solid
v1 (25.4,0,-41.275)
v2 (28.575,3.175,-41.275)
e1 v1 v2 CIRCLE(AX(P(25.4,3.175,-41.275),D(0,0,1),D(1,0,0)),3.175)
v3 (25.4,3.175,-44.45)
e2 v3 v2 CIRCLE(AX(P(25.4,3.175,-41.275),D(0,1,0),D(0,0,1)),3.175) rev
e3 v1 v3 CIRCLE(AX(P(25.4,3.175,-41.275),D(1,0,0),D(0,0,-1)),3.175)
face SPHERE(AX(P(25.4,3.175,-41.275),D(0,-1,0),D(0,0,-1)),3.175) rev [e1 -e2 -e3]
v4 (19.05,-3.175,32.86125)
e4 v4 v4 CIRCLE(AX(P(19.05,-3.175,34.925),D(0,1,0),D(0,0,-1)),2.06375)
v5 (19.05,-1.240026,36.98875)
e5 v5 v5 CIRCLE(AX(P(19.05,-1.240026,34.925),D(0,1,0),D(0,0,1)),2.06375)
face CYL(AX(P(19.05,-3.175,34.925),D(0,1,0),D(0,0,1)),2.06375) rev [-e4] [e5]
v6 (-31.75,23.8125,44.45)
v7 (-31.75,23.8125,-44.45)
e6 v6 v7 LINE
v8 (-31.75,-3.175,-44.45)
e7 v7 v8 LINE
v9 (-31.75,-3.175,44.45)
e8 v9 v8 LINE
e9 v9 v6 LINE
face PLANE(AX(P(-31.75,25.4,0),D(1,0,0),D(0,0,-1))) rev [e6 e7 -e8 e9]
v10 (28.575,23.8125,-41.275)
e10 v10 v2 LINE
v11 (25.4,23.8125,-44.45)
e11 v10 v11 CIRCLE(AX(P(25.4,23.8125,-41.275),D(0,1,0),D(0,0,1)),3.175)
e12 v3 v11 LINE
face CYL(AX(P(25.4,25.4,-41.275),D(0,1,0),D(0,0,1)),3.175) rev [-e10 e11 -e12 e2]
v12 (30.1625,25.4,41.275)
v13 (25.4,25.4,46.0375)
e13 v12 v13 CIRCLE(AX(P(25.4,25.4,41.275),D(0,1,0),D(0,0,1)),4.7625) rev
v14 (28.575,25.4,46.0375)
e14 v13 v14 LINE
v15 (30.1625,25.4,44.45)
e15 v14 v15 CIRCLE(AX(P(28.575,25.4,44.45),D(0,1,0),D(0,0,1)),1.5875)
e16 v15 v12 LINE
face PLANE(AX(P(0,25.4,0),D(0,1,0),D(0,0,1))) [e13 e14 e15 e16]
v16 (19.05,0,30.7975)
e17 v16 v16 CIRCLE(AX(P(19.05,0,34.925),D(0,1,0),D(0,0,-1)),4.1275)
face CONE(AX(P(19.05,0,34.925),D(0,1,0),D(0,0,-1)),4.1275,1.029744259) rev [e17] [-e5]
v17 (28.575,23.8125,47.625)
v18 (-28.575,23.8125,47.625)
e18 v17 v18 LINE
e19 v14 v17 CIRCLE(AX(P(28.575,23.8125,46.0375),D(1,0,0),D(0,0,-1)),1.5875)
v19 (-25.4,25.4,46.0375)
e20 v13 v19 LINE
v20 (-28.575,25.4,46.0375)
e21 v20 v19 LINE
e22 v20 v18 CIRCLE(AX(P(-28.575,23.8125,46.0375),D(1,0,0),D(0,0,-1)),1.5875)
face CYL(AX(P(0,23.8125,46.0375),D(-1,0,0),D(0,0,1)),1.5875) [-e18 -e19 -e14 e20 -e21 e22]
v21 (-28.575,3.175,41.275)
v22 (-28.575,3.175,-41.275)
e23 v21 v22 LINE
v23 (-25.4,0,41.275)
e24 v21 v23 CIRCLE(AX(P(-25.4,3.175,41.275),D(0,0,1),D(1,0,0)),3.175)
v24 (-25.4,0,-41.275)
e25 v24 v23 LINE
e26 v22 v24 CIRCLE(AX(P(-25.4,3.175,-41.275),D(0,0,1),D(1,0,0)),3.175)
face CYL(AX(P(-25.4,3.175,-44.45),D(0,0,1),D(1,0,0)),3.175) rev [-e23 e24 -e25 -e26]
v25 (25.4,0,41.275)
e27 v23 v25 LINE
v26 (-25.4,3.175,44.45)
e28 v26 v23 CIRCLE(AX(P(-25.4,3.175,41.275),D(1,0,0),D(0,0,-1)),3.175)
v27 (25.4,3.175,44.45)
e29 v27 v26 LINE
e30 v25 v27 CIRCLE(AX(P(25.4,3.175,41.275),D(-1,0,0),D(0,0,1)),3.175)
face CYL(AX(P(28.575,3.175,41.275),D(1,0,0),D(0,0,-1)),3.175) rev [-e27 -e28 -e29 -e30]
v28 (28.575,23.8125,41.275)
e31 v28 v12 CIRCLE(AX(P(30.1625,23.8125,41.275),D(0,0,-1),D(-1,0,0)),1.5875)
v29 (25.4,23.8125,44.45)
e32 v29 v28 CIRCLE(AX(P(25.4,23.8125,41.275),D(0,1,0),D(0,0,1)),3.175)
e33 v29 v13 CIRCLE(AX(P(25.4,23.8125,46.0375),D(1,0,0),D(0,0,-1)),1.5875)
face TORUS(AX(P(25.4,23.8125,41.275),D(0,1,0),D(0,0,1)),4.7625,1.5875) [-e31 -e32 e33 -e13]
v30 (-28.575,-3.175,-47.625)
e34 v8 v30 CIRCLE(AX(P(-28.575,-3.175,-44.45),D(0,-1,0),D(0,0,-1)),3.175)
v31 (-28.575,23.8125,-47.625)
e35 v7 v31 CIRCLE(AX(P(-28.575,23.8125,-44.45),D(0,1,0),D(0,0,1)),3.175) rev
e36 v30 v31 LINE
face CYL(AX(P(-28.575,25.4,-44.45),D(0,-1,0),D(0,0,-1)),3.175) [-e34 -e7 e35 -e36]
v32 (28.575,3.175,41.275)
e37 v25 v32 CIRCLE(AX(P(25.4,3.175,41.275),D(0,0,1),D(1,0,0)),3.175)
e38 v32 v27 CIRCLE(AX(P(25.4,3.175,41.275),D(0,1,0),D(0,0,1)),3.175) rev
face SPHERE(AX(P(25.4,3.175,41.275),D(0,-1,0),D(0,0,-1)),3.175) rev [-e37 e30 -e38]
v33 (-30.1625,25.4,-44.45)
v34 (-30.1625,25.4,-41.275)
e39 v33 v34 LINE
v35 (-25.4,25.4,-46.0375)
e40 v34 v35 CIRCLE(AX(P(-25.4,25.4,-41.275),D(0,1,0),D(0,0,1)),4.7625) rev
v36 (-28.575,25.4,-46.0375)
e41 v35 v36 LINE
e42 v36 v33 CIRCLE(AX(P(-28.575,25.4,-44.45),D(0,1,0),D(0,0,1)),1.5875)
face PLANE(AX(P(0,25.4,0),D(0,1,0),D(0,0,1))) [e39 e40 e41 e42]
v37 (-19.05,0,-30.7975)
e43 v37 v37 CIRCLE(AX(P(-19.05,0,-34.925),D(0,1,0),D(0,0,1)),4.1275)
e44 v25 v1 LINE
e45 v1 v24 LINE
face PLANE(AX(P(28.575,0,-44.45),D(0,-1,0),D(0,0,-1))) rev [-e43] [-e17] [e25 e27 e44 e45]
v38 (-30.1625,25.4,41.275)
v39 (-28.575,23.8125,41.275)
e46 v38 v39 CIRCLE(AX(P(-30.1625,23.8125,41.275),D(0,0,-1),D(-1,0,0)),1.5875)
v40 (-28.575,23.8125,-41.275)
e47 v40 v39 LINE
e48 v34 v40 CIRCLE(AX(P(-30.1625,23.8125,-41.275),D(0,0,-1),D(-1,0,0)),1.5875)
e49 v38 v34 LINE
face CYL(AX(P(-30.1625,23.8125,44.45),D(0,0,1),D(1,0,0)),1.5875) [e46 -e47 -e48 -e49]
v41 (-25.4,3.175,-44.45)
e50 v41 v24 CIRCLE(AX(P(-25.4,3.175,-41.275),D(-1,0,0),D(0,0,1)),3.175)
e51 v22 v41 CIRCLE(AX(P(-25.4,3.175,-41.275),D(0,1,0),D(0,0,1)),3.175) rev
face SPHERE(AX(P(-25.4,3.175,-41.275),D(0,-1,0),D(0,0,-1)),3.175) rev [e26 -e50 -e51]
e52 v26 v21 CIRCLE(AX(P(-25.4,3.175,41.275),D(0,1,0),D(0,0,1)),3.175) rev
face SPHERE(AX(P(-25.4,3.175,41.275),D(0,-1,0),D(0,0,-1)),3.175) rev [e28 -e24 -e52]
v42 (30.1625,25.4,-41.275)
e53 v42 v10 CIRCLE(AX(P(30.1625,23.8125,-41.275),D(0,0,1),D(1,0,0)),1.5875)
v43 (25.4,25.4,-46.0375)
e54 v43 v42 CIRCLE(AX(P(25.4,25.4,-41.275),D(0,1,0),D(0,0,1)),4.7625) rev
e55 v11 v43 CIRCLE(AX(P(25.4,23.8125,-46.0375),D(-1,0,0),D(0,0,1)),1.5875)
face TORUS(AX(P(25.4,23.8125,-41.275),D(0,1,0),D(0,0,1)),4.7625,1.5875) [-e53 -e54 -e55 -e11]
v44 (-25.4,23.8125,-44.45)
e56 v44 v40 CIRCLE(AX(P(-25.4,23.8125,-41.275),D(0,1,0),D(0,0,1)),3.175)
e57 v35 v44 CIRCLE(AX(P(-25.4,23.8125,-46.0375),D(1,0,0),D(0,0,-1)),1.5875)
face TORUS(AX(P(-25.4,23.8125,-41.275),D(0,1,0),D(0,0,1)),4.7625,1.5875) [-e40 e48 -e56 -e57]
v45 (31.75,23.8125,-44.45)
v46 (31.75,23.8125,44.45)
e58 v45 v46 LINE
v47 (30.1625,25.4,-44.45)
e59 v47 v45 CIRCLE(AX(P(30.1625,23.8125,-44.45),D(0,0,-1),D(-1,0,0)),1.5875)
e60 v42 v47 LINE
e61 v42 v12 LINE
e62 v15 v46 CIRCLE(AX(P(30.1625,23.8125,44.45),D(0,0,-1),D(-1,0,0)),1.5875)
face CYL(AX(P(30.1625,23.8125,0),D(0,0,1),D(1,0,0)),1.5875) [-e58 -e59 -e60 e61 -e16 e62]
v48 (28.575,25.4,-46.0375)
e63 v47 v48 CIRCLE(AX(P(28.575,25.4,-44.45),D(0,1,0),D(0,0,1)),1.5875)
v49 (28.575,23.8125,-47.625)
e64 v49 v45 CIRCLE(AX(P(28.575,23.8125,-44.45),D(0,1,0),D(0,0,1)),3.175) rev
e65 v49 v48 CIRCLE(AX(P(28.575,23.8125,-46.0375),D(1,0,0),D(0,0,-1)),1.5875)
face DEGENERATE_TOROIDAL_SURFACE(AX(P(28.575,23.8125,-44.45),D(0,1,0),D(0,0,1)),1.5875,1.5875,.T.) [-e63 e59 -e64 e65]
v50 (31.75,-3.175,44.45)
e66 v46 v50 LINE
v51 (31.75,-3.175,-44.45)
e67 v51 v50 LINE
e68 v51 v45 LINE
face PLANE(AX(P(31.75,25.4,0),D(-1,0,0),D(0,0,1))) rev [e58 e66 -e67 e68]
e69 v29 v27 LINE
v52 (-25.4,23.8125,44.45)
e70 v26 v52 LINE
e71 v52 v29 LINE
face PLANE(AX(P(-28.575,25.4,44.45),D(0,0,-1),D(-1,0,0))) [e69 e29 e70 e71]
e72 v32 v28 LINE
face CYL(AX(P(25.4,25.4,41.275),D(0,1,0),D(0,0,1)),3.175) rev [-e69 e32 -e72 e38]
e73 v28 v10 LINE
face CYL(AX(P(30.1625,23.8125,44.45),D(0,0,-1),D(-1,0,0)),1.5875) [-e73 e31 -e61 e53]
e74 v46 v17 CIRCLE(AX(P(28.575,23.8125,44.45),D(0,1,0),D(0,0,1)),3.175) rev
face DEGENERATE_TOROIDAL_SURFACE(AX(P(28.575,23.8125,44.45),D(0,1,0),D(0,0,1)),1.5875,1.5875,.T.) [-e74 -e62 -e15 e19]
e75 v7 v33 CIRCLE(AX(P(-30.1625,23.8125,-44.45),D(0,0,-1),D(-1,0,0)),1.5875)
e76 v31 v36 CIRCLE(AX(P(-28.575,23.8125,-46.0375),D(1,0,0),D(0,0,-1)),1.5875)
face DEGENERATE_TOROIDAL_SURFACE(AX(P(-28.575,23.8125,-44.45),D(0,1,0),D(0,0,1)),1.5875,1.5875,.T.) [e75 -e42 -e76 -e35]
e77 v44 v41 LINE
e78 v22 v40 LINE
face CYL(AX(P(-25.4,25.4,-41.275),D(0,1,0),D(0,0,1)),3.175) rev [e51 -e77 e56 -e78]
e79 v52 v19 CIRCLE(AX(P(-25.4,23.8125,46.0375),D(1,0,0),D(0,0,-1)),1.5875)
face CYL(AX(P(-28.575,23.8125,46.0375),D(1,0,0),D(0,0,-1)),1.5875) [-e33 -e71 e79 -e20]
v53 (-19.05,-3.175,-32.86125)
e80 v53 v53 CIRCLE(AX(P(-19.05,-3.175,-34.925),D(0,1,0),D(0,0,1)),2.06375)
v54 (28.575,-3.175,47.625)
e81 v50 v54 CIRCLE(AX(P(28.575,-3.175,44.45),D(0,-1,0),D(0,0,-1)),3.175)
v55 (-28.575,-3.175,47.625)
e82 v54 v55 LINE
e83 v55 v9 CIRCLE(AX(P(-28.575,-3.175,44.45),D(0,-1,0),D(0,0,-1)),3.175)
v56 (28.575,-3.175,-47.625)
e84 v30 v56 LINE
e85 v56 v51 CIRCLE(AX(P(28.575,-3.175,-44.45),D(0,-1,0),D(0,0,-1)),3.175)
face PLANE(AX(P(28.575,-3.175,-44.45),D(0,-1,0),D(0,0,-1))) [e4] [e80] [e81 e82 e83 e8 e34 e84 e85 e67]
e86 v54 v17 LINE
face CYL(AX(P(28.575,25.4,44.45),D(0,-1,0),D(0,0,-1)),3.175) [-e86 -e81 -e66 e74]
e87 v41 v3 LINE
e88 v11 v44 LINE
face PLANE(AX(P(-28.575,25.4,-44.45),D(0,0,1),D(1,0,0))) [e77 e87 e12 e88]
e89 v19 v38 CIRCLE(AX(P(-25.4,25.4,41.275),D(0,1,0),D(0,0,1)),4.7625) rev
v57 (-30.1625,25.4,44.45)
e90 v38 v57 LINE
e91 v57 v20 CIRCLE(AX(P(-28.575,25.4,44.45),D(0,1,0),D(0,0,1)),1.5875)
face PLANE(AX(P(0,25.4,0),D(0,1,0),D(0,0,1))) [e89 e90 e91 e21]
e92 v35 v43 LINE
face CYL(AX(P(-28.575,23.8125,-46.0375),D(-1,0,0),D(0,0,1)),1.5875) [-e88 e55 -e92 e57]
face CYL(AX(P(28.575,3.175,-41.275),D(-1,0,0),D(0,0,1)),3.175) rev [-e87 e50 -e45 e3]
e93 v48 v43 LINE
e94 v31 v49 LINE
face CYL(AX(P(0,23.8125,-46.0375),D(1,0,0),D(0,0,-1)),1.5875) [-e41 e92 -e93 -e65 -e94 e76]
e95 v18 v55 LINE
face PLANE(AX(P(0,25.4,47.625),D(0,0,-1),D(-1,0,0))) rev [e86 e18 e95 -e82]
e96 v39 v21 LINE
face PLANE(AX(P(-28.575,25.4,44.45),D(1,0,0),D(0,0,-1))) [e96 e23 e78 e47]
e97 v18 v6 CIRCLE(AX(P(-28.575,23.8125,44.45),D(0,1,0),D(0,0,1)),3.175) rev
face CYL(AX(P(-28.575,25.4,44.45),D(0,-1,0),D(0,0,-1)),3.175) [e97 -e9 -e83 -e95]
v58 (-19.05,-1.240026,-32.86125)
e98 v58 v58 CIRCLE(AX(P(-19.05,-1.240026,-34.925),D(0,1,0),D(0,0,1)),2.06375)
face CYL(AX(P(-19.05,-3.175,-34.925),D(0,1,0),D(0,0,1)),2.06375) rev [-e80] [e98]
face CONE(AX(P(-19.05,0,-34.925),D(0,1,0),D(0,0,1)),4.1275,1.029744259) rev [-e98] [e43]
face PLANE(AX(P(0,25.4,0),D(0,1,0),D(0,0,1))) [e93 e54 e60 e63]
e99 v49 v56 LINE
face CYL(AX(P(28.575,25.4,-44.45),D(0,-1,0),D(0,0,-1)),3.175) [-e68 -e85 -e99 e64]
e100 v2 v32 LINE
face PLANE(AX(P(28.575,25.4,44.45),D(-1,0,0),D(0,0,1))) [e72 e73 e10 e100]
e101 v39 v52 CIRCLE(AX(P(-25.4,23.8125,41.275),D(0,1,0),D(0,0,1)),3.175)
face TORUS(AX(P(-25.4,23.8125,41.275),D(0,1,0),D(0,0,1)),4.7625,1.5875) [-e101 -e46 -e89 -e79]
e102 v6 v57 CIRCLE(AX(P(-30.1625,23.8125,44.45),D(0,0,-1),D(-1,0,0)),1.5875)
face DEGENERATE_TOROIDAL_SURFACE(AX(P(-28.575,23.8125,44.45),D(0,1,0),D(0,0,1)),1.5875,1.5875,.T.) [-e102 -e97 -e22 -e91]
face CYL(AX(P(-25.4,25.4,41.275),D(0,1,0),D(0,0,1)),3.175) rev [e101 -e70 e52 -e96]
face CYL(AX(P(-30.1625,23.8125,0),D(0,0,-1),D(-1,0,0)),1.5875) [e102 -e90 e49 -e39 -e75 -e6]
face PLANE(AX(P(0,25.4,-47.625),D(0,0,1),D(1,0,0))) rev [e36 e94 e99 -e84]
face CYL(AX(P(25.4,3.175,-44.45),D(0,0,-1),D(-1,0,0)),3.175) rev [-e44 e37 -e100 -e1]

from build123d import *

# Parameters (mm, degrees)
SKETCH1_W           = 63.5
SKETCH1_H           = 95.25
SKETCH1_W_2         = 57.15
SKETCH1_H_2         = 88.9
EXTRUDE_THIN1_DEPTH = 25.4
FILLET1_R           = 3.175
BOSS_EXTRUDE1_DEPTH = 3.175
FILLET2_R           = 3.175
SKETCH3_R           = 2.06375
CUT_EXTRUDE1_DEPTH  = 3.175
CIRPATTERN1_COUNT   = 2
FILLET3_R           = 1.5875


with BuildPart() as part:
    # Sketch1 → Extrude-Thin1 (new body)
    with BuildSketch(Plane(origin=(0, 0, 0), x_dir=(1, 0, 0), z_dir=(0, 1, 0))):
        Rectangle(SKETCH1_W, SKETCH1_H)
        Rectangle(SKETCH1_W_2, SKETCH1_H_2, mode=Mode.SUBTRACT)
    extrude(amount=EXTRUDE_THIN1_DEPTH)

    # Fillet1
    fillet1_edges = [part.edges().sort_by_distance(p)[0] for p in [
        (28.575, 12.7, 44.45),
        (28.575, 12.7, -44.45),
        (-28.575, 12.7, -44.45),
        (-28.575, 12.7, 44.45),
        (31.75, 12.7, 47.625),
        (-31.75, 12.7, 47.625),
        (-31.75, 12.7, -47.625),
        (31.75, 12.7, -47.625),
    ]]
    fillet(fillet1_edges, radius=FILLET1_R)

    # Sketch2 → Boss-Extrude1 (add)
    with BuildSketch(Plane.XZ):
        with BuildLine():
            Line((31.75, -44.45), (31.75, 44.45))
            ThreePointArc((31.75, 44.45), (30.82006403, 46.69506403), (28.575, 47.625))
            Line((28.575, 47.625), (-28.575, 47.625))
            ThreePointArc((-28.575, 47.625), (-30.82006403, 46.69506403), (-31.75, 44.45))
            Line((-31.75, 44.45), (-31.75, -44.45))
            ThreePointArc((-31.75, -44.45), (-30.82006403, -46.69506403), (-28.575, -47.625))
            Line((-28.575, -47.625), (28.575, -47.625))
            ThreePointArc((28.575, -47.625), (30.82006403, -46.69506403), (31.75, -44.45))
        make_face()
    extrude(amount=BOSS_EXTRUDE1_DEPTH)

    # Fillet2
    fillet2_edges = [part.edges().sort_by_distance(p)[0] for p in [
        (28.575, 0, 0),
        (0, 0, -44.45),
        (-28.575, 0, 0),
        (0, 0, 44.45),
        (-27.64506403, 0, 43.52006403),
        (27.64506403, 0, 43.52006403),
        (27.64506403, 0, -43.52006403),
        (-27.64506403, 0, -43.52006403),
    ]]
    fillet(fillet2_edges, radius=FILLET2_R)

    # Sketch3 → Cut-Extrude1 (cut)
    with BuildSketch(Plane(origin=(0, 0, 0), x_dir=(1, 0, 0), z_dir=(0, 1, 0))):
        with Locations(Location((-19.05, 34.925, 0), (0, 0, 270))):
            Circle(SKETCH3_R)
    cut_extrude1 = extrude(amount=-CUT_EXTRUDE1_DEPTH, mode=Mode.SUBTRACT)

    # Sketch4 → Cut-Revolve1 (revolve, cut)
    with BuildSketch(Plane.YX.offset(34.925), mode=Mode.PRIVATE) as cut_revolve1_sk:
        Polygon((-2.480052205, -19.05), (0, -14.9225), (0, -19.05), align=None)
    cut_revolve1 = revolve(cut_revolve1_sk.sketch.rotate(Axis((-19.05, 0, -34.925), (0, -1, 0)), 90), axis=Axis((-19.05, 0, -34.925), (0, -1, 0)), mode=Mode.SUBTRACT)

    # CirPattern1: Cut-Extrude1, Cut-Revolve1 ×2 about axis
    cirpattern1_axis = Axis((0, 0, 0), (0, 1, 0))
    add([cut_extrude1.rotate(cirpattern1_axis, i * 360 / CIRPATTERN1_COUNT) for i in range(1, CIRPATTERN1_COUNT)], mode=Mode.SUBTRACT)
    add([cut_revolve1.rotate(cirpattern1_axis, i * 360 / CIRPATTERN1_COUNT) for i in range(1, CIRPATTERN1_COUNT)], mode=Mode.SUBTRACT)

    # Fillet3
    fillet3_edges = [part.edges().sort_by_distance(p)[0] for p in [
        (31.75, 25.4, 0),
        (0, 25.4, 47.625),
        (0, 25.4, -47.625),
        (-31.75, 25.4, 0),
        (0, 25.4, -44.45),
        (28.575, 25.4, 0),
        (0, 25.4, 44.45),
        (-28.575, 25.4, 0),
        (-30.82006403, 25.4, 46.69506403),
        (30.82006403, 25.4, -46.69506403),
        (-30.82006403, 25.4, -46.69506403),
        (30.82006403, 25.4, 46.69506403),
        (-27.64506403, 25.4, 43.52006403),
        (27.64506403, 25.4, 43.52006403),
        (27.64506403, 25.4, -43.52006403),
        (-27.64506403, 25.4, -43.52006403),
    ]]
    fillet(fillet3_edges, radius=FILLET3_R - 0.0001)  # a hair under: the kernel refuses the full size


solid = part.part
